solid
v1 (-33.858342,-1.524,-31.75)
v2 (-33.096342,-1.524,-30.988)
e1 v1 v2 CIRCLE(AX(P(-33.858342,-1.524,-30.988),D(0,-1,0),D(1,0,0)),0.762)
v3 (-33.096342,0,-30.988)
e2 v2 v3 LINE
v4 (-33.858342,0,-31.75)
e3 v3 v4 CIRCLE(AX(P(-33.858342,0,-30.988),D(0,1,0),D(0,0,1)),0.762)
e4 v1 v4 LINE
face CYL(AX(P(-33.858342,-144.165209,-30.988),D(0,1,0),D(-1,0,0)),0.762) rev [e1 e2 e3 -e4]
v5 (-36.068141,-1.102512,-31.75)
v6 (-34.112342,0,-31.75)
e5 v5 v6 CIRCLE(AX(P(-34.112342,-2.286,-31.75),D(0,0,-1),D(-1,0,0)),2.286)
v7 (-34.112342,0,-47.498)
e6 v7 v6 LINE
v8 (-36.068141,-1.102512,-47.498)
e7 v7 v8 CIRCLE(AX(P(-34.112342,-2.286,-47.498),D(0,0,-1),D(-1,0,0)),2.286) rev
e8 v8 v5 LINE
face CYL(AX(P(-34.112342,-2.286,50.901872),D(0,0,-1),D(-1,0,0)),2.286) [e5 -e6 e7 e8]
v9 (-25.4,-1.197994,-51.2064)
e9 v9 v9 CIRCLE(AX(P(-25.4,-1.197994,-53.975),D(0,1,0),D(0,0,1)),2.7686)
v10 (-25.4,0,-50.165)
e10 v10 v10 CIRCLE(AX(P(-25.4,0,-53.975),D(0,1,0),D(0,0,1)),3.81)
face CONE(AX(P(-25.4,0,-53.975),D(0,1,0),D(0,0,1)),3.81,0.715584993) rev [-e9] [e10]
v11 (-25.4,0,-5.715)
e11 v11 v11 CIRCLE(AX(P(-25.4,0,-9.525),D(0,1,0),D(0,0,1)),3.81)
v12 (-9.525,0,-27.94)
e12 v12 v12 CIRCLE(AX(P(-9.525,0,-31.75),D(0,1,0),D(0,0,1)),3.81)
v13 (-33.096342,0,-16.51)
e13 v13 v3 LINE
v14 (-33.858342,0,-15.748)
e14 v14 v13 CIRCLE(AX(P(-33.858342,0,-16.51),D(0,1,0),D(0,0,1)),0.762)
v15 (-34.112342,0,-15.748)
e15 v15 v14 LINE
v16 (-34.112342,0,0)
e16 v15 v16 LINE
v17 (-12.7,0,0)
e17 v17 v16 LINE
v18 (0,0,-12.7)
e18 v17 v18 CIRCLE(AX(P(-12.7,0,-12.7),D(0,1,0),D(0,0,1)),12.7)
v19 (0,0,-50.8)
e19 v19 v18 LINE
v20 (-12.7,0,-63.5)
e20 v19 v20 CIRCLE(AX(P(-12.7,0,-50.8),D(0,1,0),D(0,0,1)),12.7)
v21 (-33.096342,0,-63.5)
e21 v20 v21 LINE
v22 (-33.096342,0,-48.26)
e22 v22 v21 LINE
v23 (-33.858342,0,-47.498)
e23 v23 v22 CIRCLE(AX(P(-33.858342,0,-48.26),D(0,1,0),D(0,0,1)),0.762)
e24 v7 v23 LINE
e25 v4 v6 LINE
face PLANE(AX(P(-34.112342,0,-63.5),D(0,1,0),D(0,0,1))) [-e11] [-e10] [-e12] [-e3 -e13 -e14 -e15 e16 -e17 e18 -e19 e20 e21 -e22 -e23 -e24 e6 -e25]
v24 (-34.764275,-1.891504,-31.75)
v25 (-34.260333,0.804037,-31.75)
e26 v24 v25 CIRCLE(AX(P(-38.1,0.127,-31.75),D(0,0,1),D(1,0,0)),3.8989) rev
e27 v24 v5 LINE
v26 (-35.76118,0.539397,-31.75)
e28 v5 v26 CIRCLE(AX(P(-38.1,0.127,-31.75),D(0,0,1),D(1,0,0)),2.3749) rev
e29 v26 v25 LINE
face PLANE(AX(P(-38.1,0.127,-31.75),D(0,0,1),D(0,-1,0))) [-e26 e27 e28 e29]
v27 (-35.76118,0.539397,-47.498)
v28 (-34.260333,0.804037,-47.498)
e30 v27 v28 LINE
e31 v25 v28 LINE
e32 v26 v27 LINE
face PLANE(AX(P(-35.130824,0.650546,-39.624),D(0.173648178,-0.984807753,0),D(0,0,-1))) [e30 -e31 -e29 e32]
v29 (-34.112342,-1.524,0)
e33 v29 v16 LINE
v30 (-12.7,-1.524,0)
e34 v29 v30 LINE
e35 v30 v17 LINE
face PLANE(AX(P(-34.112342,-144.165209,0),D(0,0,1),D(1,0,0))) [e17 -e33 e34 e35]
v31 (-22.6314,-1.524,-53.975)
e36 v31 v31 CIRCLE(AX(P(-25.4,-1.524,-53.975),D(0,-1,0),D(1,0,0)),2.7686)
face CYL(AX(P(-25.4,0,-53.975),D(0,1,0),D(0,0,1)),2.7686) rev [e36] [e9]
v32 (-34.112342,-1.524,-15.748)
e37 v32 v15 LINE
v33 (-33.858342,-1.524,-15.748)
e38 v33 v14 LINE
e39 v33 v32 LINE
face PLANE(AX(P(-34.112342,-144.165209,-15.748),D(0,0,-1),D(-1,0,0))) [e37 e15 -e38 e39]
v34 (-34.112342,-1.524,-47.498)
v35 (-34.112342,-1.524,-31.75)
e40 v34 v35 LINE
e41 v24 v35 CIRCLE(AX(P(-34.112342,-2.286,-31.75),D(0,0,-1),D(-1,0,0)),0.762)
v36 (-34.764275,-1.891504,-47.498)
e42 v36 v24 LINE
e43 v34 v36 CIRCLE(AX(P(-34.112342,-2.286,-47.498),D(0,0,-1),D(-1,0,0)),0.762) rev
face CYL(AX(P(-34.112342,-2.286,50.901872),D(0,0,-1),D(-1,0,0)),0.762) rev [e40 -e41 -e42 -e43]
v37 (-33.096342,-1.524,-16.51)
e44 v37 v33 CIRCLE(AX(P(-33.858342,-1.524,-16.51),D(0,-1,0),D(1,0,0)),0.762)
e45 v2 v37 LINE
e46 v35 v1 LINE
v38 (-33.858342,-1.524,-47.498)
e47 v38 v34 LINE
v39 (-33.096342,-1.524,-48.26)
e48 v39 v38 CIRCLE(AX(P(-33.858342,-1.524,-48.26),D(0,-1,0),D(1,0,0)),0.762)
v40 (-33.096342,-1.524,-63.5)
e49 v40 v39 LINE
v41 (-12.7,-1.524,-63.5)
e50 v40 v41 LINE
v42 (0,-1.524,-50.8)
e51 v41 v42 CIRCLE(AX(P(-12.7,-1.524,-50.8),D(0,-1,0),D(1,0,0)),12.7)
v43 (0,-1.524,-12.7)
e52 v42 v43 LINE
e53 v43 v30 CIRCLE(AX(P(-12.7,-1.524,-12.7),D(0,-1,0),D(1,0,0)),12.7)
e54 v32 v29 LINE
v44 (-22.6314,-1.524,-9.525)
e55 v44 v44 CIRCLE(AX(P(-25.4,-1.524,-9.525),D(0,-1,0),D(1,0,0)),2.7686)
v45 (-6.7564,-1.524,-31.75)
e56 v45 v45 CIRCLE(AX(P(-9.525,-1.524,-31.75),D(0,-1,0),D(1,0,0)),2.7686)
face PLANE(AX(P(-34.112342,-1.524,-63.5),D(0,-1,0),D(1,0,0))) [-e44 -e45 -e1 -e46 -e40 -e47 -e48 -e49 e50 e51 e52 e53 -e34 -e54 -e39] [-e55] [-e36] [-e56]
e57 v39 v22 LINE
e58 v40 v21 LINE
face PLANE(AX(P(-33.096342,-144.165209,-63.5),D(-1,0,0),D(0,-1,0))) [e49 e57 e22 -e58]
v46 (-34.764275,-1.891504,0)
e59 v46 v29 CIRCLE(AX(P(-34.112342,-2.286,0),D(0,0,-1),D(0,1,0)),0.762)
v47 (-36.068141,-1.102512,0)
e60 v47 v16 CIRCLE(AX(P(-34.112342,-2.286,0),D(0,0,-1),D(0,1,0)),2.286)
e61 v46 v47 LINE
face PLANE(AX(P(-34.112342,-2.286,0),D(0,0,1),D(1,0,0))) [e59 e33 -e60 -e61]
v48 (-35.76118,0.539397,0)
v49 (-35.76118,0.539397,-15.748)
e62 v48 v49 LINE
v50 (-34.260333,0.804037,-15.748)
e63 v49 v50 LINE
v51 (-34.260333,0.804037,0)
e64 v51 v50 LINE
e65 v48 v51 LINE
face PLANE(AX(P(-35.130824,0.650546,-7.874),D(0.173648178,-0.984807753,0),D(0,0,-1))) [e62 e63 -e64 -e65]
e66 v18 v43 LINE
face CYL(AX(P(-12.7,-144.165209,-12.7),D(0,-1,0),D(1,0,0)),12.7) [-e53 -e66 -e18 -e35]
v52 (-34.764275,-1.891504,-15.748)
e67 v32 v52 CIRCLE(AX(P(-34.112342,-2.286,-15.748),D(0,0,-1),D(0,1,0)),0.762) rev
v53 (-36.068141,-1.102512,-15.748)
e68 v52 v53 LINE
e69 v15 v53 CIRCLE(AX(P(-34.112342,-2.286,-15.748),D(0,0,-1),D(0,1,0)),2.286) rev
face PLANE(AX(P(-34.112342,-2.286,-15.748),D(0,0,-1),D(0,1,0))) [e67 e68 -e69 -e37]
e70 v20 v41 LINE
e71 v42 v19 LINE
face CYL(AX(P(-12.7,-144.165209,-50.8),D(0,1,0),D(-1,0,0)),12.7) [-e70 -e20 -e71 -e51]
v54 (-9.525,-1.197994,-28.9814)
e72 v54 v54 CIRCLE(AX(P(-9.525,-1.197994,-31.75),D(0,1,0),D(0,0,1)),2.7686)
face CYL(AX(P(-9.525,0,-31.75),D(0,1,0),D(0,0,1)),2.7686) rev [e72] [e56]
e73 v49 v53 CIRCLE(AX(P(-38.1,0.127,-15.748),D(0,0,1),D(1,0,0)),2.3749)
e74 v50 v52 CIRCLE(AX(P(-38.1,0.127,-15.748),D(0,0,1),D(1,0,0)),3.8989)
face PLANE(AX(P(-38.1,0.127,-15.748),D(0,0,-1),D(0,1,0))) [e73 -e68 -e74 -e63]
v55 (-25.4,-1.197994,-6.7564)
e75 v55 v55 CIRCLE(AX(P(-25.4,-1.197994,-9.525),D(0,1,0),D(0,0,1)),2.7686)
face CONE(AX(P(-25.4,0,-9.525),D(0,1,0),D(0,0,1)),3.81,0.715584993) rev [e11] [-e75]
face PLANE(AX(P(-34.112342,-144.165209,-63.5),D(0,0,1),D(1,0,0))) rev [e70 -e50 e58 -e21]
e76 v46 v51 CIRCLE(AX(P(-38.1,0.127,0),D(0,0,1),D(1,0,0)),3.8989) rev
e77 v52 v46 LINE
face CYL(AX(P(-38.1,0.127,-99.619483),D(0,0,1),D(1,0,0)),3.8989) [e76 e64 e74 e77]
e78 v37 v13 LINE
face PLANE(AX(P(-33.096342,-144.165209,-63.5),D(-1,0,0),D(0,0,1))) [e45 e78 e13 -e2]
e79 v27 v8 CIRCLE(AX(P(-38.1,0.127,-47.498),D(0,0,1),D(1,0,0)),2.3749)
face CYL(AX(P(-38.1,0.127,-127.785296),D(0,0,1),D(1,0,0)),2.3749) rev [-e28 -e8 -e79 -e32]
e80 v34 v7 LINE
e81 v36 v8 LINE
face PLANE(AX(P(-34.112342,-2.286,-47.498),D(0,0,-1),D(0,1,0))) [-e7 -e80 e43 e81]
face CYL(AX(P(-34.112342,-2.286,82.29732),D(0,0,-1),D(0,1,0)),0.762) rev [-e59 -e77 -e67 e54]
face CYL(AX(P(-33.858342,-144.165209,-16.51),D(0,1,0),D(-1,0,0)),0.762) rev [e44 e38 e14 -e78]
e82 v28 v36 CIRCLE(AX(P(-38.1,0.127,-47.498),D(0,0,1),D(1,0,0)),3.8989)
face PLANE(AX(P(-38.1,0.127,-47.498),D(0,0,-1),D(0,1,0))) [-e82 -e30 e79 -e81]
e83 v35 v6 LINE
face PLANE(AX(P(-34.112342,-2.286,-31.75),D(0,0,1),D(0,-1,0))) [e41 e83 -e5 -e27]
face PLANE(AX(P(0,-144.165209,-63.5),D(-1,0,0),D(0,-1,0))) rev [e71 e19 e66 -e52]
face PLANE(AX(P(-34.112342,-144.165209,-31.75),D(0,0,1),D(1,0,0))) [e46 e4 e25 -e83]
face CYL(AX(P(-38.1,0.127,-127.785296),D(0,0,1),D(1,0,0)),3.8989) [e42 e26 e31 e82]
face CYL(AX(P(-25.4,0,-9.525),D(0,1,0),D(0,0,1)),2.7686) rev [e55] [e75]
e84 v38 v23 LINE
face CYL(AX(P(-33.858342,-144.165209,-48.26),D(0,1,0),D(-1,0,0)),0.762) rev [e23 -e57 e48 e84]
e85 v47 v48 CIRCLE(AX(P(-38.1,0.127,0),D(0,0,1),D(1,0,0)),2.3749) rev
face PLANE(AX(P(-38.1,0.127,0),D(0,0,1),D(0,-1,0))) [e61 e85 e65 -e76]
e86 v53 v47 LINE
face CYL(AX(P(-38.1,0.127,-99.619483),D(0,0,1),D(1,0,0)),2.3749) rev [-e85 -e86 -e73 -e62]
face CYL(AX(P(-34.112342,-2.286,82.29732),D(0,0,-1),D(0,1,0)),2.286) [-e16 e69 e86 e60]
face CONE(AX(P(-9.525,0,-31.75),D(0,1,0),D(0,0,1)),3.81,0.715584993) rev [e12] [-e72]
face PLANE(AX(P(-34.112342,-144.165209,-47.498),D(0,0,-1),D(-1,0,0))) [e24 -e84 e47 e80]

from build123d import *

# Parameters (mm, degrees)
BASICHINGE_DEPTH                              = 63.5
KNUCKLECUTS_DEPTH                             = 77.238871136
KNUCKLECUTS_DEPTH_BACK                        = 77.238871136
CSK_FOR_6_FLAT_HEAD_MACHINE_SCREW1_AT_2_COUNT = 2
CSK_FOR_6_FLAT_HEAD_MACHINE_SCREW1_AT_2_PITCH = 27.312382723
CSK_FOR_6_FLAT_HEAD_MACHINE_SCREW1_AT_3_COUNT = 2
CSK_FOR_6_FLAT_HEAD_MACHINE_SCREW1_AT_3_PITCH = 27.312382723
FLATTEN_BENDS1_OUTLINE_W                      = 19.328541328
FLATTEN_BENDS1_OUTLINE_H                      = 15.748
FLATTEN_BENDS1_DEPTH                          = 4.0259
FLATTEN_BENDS1_START                          = -3.7719
FLATTEN_BENDS1_2_OUTLINE_W                    = 19.328541328
FLATTEN_BENDS1_2_OUTLINE_H                    = 15.748
FLATTEN_BENDS1_2_DEPTH                        = 2.2479
FLATTEN_BENDS1_START_2                        = -1.524
FLATTEN_BENDS1_3_OUTLINE_W                    = 19.328541328
FLATTEN_BENDS1_3_OUTLINE_H                    = 15.748
FLATTEN_BENDS1_3_DEPTH                        = 1.524
PROCESS_BENDS1_START                          = -47.498
PROCESS_BENDS1_DEPTH                          = 47.498
PROCESS_BENDS1_2_DEPTH                        = 15.748
PROCESS_BENDS1_START_2                        = -15.748
PROCESS_BENDS1_3_DEPTH                        = 15.748
FILLET1_R                                     = 12.7


# Read off the part's stored shape, not the designer's step: Flatten-Bends1, Process-Bends1
with BuildPart() as part:
    # Sketch1 → BasicHinge (new body)
    with BuildSketch(Plane.XY):
        with BuildLine():
            Line((0, -1.524), (0, 0))
            Line((0, 0), (-34.112341563, 0))
            ThreePointArc((-34.112341563, 0), (-35.234915175, -0.294612422), (-36.068141341, -1.102512262))
            ThreePointArc((-36.068141341, -1.102512262), (-40.434453767, 0.563435127), (-35.761180067, 0.539397057))
            Line((-35.761180067, 0.539397057), (-34.260333052, 0.80403688))
            ThreePointArc((-34.260333052, 0.80403688), (-41.932498965, 0.843500449), (-34.764274822, -1.891504087))
            ThreePointArc((-34.764274822, -1.891504087), (-34.486532767, -1.622204141), (-34.112341563, -1.524))
            Line((-34.112341563, -1.524), (0, -1.524))
        make_face()
    extrude(amount=-BASICHINGE_DEPTH)

    # Sketch4 → KnuckleCuts (cut, two sides: drawn at the far end of the back side and taken through both)
    with BuildSketch(Plane(origin=(0, 0, 0), x_dir=(-1, 0, 0), z_dir=(0, 1, 0)).offset(-KNUCKLECUTS_DEPTH_BACK)):
        with BuildLine():
            Line((41.9989, -63.5), (33.096341563, -63.5))
            Line((33.096341563, -63.5), (33.096341563, -48.26))
            ThreePointArc((33.096341563, -48.26), (33.319526196, -47.721184633), (33.858341563, -47.498))
            Line((33.858341563, -47.498), (41.9989, -47.498))
            Line((41.9989, -47.498), (41.9989, -63.5))
        make_face()
        with BuildLine():
            Line((41.9989, -31.75), (33.858341563, -31.75))
            ThreePointArc((33.858341563, -31.75), (33.319526196, -31.526815367), (33.096341563, -30.988))
            Line((33.096341563, -30.988), (33.096341563, -16.51))
            ThreePointArc((33.096341563, -16.51), (33.319526196, -15.971184633), (33.858341563, -15.748))
            Line((33.858341563, -15.748), (41.9989, -15.748))
            Line((41.9989, -15.748), (41.9989, -31.75))
        make_face()
    extrude(amount=KNUCKLECUTS_DEPTH + KNUCKLECUTS_DEPTH_BACK, mode=Mode.SUBTRACT)

    # Sketch5 → CSK for #6 Flat Head Machine Screw1 (revolve, cut)
    with BuildSketch(Plane(origin=(-9.525, 0, -31.75), x_dir=(0, 0, 1), z_dir=(1, 0, 0))):
        Polygon((0, 0), (0, 1.524), (2.7686, 1.524), (2.7686, 1.197993659), (3.81, 0), align=None)
    csk_for_6_flat_head_machine_screw1 = revolve(axis=Axis((-9.525, 6.35, -31.75), (0, -1, 0)), mode=Mode.SUBTRACT)

    # CSK for #6 Flat Head Machine Screw1 at 2: CSK for #6 Flat Head Machine Screw1 ×2
    with Locations(*[Vector(-0.5812381937190965, 0, 0.813733471206735) * (i * CSK_FOR_6_FLAT_HEAD_MACHINE_SCREW1_AT_2_PITCH) for i in range(1, CSK_FOR_6_FLAT_HEAD_MACHINE_SCREW1_AT_2_COUNT)]):
        add(csk_for_6_flat_head_machine_screw1, mode=Mode.SUBTRACT)

    # CSK for #6 Flat Head Machine Screw1 at 3: CSK for #6 Flat Head Machine Screw1 ×2
    with Locations(*[Vector(-0.5812381937190965, 0, -0.813733471206735) * (i * CSK_FOR_6_FLAT_HEAD_MACHINE_SCREW1_AT_3_PITCH) for i in range(1, CSK_FOR_6_FLAT_HEAD_MACHINE_SCREW1_AT_3_COUNT)]):
        add(csk_for_6_flat_head_machine_screw1, mode=Mode.SUBTRACT)

    # Flatten-Bends1 outline → Flatten-Bends1 (cut)
    with BuildSketch(Plane(origin=(0, 0, 0), x_dir=(1, 0, 0), z_dir=(0, 1, 0))):
        with Locations((-42.664270664, 39.624)):
            Rectangle(FLATTEN_BENDS1_OUTLINE_W, FLATTEN_BENDS1_OUTLINE_H)
        with Locations((-42.664270664, 7.874)):
            Rectangle(FLATTEN_BENDS1_OUTLINE_W, FLATTEN_BENDS1_OUTLINE_H)
    extrude(amount=FLATTEN_BENDS1_DEPTH, mode=Mode.SUBTRACT)

    # Flatten-Bends1 2 outline → Flatten-Bends1 2 (cut)
    with BuildSketch(Plane(origin=(0, 0, 0), x_dir=(1, 0, 0), z_dir=(0, 1, 0)).offset(FLATTEN_BENDS1_START)):
        with Locations((-42.664270664, 39.624)):
            Rectangle(FLATTEN_BENDS1_2_OUTLINE_W, FLATTEN_BENDS1_2_OUTLINE_H)
        with Locations((-42.664270664, 7.874)):
            Rectangle(FLATTEN_BENDS1_2_OUTLINE_W, FLATTEN_BENDS1_2_OUTLINE_H)
    extrude(amount=FLATTEN_BENDS1_2_DEPTH, mode=Mode.SUBTRACT)

    # Flatten-Bends1 3 outline → Flatten-Bends1 3 (add)
    with BuildSketch(Plane(origin=(0, 0, 0), x_dir=(1, 0, 0), z_dir=(0, 1, 0)).offset(FLATTEN_BENDS1_START_2)):
        with Locations((-42.664270664, 39.624)):
            Rectangle(FLATTEN_BENDS1_3_OUTLINE_W, FLATTEN_BENDS1_3_OUTLINE_H)
        with Locations((-42.664270664, 7.874)):
            Rectangle(FLATTEN_BENDS1_3_OUTLINE_W, FLATTEN_BENDS1_3_OUTLINE_H)
    extrude(amount=FLATTEN_BENDS1_3_DEPTH)

    # Process-Bends1 outline → Process-Bends1 (cut)
    with BuildSketch(Plane.XY.offset(PROCESS_BENDS1_START)):
        with BuildLine():
            ThreePointArc((-36.392853547, -1.524), (-36.218656654, -1.322378221), (-36.068141341, -1.102512262))
            ThreePointArc((-36.068141341, -1.102512262), (-35.234915175, -0.294612422), (-34.112341563, 0))
            Line((-34.112341563, 0), (-40.471501847, 0))
            ThreePointArc((-40.471501847, 0), (-40.277036286, -0.822032677), (-39.807146453, -1.524))
            Line((-39.807146453, -1.524), (-36.392853547, -1.524))
        make_face()
        with BuildLine():
            Line((-52.328541328, -1.524), (-41.632084401, -1.524))
            ThreePointArc((-41.632084401, -1.524), (-41.891812256, -0.780513652), (-41.996831047, 0))
            Line((-41.996831047, 0), (-52.328541328, 0))
            Line((-52.328541328, 0), (-52.328541328, -1.524))
        make_face()
    extrude(amount=PROCESS_BENDS1_DEPTH, mode=Mode.SUBTRACT)

    # Process-Bends1 2 outline → Process-Bends1 2 (add)
    with BuildSketch(Plane.XY.offset(PROCESS_BENDS1_START)):
        with BuildLine():
            Line((-34.112341563, -1.524), (-36.392853547, -1.524))
            ThreePointArc((-36.392853547, -1.524), (-38.1, -2.247900001), (-39.807146453, -1.524))
            Line((-39.807146453, -1.524), (-41.632084401, -1.524))
            ThreePointArc((-41.632084401, -1.524), (-38.308336386, -3.76632983), (-34.764274822, -1.891504087))
            ThreePointArc((-34.764274822, -1.891504087), (-34.486532767, -1.622204141), (-34.112341563, -1.524))
        make_face()
        with BuildLine():
            Line((-41.996831047, 0), (-40.471501847, 0))
            ThreePointArc((-40.471501847, 0), (-38.370193122, 2.486479961), (-35.761180067, 0.539397057))
            Line((-35.761180067, 0.539397057), (-34.260333052, 0.80403688))
            ThreePointArc((-34.260333052, 0.80403688), (-38.503033199, 4.00501308), (-41.996831047, 0))
        make_face()
    extrude(amount=PROCESS_BENDS1_2_DEPTH)

    # Process-Bends1 3 outline → Process-Bends1 3 (add)
    with BuildSketch(Plane.XY.offset(PROCESS_BENDS1_START_2)):
        with BuildLine():
            Line((-34.112341563, -1.524), (-36.392853547, -1.524))
            ThreePointArc((-36.392853547, -1.524), (-38.1, -2.247900001), (-39.807146453, -1.524))
            Line((-39.807146453, -1.524), (-41.632084401, -1.524))
            ThreePointArc((-41.632084401, -1.524), (-38.308336386, -3.76632983), (-34.764274822, -1.891504087))
            ThreePointArc((-34.764274822, -1.891504087), (-34.486532767, -1.622204141), (-34.112341563, -1.524))
        make_face()
        with BuildLine():
            Line((-41.996831047, 0), (-40.471501847, 0))
            ThreePointArc((-40.471501847, 0), (-38.370193122, 2.486479961), (-35.761180067, 0.539397057))
            Line((-35.761180067, 0.539397057), (-34.260333052, 0.80403688))
            ThreePointArc((-34.260333052, 0.80403688), (-38.503033199, 4.00501308), (-41.996831047, 0))
        make_face()
    extrude(amount=PROCESS_BENDS1_3_DEPTH)

    # Fillet1
    fillet1_edges = [part.edges().sort_by_distance(p)[0] for p in [
        (0, -0.762, -63.5),
        (0, -0.762, 0),
    ]]
    fillet(fillet1_edges, radius=FILLET1_R)


solid = part.part
